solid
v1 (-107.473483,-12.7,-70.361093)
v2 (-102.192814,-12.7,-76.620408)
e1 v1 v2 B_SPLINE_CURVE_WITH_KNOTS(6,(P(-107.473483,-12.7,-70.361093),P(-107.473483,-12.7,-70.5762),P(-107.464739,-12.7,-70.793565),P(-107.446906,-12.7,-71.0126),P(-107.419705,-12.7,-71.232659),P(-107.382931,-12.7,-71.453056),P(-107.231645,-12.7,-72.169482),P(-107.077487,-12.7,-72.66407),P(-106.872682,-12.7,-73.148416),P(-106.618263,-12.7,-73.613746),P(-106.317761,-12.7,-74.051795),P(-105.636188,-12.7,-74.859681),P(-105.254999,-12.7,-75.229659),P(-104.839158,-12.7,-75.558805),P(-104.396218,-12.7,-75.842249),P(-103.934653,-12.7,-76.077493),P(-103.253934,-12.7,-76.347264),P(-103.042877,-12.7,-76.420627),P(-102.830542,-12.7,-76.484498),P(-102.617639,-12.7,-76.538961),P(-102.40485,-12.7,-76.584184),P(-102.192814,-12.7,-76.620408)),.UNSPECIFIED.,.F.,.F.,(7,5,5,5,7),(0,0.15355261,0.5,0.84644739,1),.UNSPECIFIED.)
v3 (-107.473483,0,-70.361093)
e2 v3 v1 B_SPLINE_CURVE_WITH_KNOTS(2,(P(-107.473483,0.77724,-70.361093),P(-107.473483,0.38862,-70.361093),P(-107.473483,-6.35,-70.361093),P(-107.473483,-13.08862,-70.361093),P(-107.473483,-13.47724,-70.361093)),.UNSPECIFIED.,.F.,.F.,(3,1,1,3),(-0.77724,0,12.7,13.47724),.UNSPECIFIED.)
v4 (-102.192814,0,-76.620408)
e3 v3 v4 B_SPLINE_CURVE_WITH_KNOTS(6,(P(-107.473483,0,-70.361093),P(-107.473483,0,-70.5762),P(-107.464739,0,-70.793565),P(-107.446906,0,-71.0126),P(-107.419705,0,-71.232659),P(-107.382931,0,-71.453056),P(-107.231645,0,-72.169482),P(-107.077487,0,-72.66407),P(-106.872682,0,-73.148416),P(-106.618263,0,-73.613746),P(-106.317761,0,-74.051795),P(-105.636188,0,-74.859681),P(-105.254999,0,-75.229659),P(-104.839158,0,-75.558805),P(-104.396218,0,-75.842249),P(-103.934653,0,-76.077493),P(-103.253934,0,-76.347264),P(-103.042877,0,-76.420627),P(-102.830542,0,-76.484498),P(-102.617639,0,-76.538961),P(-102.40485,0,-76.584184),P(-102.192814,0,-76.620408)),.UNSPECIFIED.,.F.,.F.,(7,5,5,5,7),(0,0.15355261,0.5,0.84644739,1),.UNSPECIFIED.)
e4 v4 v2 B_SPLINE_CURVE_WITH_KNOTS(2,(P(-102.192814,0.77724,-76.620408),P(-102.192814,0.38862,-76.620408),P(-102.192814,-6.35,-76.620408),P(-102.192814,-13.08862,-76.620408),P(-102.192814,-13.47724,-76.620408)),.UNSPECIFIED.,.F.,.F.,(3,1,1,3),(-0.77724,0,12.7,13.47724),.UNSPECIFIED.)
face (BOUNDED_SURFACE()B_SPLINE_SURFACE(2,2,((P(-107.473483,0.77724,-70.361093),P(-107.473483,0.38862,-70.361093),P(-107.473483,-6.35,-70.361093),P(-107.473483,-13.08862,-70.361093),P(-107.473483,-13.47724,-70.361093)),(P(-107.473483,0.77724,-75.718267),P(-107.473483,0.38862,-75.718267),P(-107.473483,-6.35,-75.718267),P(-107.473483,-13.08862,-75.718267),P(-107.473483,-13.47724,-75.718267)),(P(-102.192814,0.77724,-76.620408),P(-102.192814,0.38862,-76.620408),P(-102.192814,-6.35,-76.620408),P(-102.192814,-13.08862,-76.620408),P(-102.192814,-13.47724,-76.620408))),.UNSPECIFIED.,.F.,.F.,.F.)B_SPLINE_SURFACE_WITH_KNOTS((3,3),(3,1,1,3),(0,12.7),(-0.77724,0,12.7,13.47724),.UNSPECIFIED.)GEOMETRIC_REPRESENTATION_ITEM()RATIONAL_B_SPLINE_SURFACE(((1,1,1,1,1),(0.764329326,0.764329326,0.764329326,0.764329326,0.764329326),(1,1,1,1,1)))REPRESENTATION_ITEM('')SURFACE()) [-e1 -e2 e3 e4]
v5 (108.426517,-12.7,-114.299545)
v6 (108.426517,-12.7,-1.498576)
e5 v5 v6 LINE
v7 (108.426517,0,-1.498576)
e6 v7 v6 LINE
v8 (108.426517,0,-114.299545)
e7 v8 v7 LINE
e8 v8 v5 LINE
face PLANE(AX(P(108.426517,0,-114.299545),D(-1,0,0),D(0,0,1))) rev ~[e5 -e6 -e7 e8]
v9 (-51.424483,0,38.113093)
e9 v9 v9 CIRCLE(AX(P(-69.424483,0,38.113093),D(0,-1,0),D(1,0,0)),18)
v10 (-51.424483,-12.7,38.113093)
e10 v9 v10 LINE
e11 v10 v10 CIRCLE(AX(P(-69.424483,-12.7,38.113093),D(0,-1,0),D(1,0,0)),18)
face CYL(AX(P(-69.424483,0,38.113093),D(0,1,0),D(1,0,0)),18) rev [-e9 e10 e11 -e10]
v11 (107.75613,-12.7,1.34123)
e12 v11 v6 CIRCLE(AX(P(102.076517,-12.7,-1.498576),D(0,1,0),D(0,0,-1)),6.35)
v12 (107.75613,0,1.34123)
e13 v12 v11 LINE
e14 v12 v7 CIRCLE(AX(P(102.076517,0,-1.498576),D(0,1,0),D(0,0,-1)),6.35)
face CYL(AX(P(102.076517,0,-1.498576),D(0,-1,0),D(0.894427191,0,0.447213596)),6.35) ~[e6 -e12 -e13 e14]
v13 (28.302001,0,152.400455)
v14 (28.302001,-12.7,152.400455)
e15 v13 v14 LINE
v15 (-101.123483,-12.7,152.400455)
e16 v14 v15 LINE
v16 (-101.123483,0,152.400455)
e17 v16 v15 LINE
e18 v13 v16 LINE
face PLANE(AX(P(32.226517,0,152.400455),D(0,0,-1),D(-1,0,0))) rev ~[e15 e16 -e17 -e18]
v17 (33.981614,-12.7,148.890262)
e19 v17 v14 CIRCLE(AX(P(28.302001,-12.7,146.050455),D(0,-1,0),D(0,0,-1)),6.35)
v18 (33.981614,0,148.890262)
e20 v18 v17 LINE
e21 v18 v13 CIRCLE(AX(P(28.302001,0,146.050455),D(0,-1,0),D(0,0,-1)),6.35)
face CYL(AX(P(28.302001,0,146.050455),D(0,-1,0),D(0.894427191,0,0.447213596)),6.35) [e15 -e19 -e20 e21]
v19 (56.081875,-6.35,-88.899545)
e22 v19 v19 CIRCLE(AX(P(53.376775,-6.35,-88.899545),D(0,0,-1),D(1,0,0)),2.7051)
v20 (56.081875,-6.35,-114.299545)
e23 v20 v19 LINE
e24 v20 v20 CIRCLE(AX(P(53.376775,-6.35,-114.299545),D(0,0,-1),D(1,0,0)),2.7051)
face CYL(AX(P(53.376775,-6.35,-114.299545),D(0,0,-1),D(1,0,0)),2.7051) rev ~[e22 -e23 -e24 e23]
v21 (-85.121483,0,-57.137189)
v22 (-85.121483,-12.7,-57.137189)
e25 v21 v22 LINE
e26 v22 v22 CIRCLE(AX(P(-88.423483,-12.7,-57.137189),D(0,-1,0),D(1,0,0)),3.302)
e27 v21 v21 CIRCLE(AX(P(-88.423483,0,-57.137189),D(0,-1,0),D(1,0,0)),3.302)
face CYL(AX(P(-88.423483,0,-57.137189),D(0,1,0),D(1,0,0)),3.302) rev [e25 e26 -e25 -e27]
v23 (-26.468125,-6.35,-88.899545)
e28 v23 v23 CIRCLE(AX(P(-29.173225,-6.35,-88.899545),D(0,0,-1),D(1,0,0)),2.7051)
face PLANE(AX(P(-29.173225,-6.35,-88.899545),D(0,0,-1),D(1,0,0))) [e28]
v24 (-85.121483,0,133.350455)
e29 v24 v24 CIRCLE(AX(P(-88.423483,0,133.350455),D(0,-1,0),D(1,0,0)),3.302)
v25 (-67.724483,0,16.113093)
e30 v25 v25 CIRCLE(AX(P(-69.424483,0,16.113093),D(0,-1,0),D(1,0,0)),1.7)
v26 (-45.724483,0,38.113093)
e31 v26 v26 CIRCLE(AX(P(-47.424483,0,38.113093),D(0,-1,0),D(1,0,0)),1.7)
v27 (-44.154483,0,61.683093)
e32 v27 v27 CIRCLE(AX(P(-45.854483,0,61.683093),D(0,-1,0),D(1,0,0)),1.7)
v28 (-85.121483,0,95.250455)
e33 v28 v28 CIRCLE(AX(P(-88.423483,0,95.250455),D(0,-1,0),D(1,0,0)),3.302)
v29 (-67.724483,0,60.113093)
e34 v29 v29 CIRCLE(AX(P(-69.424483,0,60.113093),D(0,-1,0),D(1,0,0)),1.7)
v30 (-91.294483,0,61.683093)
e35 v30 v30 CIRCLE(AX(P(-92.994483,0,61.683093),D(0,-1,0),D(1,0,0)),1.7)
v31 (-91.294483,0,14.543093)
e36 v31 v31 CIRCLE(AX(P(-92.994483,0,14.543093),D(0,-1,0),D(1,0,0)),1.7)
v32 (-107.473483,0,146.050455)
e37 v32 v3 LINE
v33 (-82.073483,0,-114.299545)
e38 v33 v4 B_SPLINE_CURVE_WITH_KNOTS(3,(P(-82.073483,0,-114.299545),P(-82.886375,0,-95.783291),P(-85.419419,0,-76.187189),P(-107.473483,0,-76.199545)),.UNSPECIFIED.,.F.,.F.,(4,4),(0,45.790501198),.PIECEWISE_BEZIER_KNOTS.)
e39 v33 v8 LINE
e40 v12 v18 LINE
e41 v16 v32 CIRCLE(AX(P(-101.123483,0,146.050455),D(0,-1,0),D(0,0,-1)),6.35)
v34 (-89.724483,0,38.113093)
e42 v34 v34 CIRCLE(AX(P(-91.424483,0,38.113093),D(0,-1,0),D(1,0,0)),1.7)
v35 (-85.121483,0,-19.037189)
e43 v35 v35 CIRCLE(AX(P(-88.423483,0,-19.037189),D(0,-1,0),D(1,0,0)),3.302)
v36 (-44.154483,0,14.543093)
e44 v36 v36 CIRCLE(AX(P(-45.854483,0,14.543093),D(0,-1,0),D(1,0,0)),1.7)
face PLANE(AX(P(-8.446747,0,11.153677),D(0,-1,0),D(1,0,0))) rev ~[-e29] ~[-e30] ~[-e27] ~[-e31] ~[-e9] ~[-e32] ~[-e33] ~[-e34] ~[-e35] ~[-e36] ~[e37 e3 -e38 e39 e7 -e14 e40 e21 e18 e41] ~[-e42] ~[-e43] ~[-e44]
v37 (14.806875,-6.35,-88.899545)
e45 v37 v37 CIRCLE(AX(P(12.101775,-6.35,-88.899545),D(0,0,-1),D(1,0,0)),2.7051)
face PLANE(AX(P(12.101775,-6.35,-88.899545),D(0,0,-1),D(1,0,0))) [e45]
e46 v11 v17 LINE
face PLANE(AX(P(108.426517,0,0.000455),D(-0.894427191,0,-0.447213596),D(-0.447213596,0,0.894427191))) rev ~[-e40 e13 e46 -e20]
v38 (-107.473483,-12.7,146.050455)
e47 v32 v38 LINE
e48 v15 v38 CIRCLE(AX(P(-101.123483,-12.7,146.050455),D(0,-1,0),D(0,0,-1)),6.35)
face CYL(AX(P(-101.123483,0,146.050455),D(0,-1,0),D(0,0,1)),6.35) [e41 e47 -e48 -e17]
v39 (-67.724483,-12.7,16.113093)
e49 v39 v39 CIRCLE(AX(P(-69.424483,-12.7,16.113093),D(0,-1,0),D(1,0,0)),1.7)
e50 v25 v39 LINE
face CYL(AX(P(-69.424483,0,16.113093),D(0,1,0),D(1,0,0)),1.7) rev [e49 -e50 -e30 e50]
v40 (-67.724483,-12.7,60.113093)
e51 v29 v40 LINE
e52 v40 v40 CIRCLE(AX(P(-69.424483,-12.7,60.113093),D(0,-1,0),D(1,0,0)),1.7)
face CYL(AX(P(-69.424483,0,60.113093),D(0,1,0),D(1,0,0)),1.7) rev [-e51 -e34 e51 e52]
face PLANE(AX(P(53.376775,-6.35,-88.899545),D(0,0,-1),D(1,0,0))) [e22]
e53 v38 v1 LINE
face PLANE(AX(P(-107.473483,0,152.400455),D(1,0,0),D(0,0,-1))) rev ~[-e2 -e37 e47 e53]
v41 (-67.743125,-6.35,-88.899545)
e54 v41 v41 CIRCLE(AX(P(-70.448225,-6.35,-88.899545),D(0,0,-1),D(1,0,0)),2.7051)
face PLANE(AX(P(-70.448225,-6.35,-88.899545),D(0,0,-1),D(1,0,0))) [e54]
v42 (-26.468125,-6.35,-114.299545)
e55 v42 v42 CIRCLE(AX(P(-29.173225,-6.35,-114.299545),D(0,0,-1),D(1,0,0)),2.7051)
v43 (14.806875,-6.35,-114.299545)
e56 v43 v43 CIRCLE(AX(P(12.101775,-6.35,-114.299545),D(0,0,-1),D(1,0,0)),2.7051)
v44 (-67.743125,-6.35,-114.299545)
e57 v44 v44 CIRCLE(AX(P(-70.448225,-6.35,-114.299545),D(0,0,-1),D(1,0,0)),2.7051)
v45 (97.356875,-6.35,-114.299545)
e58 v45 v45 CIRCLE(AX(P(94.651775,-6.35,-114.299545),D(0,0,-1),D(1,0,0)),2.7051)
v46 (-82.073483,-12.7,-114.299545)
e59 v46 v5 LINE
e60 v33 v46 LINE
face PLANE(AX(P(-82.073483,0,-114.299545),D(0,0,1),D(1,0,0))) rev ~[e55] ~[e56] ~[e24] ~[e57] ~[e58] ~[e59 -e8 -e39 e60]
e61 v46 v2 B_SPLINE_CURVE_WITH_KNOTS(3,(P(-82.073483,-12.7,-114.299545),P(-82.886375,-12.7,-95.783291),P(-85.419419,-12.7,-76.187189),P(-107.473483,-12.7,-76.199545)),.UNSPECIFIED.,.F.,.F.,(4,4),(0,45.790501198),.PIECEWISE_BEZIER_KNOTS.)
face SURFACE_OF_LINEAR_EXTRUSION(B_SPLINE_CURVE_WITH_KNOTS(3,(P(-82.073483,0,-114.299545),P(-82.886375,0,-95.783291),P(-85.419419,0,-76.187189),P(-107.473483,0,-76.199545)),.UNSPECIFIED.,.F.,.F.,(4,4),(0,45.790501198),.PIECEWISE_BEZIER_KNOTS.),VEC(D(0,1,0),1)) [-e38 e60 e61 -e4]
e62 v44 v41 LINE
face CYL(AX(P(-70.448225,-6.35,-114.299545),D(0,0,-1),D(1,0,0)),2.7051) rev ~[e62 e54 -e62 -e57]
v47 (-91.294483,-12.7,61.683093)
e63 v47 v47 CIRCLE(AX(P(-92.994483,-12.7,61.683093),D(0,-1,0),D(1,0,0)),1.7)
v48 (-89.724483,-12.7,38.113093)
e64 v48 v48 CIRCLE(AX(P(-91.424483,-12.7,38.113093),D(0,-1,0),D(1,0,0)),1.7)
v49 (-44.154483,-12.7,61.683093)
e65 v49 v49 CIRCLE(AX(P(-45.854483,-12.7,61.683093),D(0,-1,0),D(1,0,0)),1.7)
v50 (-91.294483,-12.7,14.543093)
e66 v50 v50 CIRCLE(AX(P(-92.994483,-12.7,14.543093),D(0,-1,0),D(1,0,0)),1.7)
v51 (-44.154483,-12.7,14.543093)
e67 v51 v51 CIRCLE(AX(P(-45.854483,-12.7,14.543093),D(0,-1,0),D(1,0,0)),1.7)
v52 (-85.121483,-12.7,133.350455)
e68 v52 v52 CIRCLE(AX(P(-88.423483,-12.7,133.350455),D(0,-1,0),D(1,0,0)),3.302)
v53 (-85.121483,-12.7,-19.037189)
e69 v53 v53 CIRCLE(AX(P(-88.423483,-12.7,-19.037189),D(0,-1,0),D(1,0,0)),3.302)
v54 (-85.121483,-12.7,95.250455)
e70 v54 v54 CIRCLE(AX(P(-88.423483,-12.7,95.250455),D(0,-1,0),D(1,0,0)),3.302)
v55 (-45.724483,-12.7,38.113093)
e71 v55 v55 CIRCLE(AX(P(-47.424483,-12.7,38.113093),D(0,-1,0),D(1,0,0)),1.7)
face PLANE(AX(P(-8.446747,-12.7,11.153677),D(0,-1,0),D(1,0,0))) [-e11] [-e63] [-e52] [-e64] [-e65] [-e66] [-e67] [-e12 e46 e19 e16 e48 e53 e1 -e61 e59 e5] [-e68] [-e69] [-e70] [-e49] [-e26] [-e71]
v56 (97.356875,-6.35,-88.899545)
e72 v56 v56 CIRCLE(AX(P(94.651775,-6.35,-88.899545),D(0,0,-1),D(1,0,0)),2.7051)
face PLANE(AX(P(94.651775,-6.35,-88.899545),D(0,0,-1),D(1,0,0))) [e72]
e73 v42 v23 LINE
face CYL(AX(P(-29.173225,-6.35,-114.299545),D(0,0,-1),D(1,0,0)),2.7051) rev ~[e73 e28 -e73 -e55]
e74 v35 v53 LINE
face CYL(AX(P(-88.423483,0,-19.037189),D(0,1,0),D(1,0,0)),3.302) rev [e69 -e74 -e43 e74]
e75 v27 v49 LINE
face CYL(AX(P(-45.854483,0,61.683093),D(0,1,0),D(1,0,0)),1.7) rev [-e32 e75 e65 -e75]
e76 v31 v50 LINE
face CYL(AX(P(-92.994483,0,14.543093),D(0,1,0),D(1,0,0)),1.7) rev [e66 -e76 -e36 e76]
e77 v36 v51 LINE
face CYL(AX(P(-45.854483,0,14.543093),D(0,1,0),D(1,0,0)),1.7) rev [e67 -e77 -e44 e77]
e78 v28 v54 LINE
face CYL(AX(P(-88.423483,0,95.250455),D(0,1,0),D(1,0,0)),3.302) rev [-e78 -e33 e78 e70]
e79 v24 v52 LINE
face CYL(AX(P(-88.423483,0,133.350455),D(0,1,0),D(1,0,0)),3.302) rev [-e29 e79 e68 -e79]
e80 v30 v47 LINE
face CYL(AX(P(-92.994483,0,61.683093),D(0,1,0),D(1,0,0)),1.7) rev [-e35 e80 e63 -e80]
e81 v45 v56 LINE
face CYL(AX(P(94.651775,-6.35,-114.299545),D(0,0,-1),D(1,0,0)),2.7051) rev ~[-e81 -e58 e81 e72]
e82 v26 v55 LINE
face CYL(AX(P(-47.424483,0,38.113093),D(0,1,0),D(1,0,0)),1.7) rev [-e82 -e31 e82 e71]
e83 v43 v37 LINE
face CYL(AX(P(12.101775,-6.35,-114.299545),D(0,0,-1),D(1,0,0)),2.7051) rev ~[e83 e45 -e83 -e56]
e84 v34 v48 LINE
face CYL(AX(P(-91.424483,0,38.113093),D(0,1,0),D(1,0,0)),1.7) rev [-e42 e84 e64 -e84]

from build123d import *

# Parameters (mm, degrees)
F0_R     = 3.302
F0_R_2   = 1.7
F0_R_3   = 18
F1_DEPTH = 12.7
F2_DEPTH = 25.4
F3_R     = 6.35
F4_R     = 2.7051
F5_DEPTH = 25.4


# Not quite as in the source:
# - a feature names something its author has since deleted; it is built from what else it names


with BuildPart() as f1:
    # F0 (on Front) → F1 (new body)
    with BuildSketch(Plane.XZ):
        with BuildLine():
            Line((108.4265169831, 0.0004552842), (32.2265169831, 152.4004552842))
            Line((32.2265169831, 152.4004552842), (-107.4734830169, 152.4004552842))
            Line((-107.4734830169, 152.4004552842), (-107.4734830169, -76.1995447158))
            add(Edge.make_bspline(
                [(-82.0734830169, -114.2995447158), (-82.8863746009, -95.7832909802), (-85.4194185281, -76.1871889735), (-107.4734830169, -76.1995447158)],
                knots=[0, 0, 0, 0, 45.7905011984, 45.7905011984, 45.7905011984, 45.7905011984], degree=3))
            Line((-82.0734830169, -114.2995447158), (108.4265169831, -114.2995447158))
            Line((108.4265169831, -114.2995447158), (108.4265169831, 0.0004552842))
        make_face()
        with Locations((-88.4234830169, -57.1371889735)):
            Circle(F0_R, mode=Mode.SUBTRACT)
        with Locations((-88.4234830169, -19.0371889735)):
            Circle(F0_R, mode=Mode.SUBTRACT)
        with Locations((-92.9944827628, 14.5430932346)):
            Circle(F0_R_2, mode=Mode.SUBTRACT)
        with Locations((-69.4244827628, 16.1130932346)):
            Circle(F0_R_2, mode=Mode.SUBTRACT)
        with Locations((-45.8544827628, 14.5430932346)):
            Circle(F0_R_2, mode=Mode.SUBTRACT)
        with Locations((-91.4244827628, 38.1130932346)):
            Circle(F0_R_2, mode=Mode.SUBTRACT)
        with Locations((-69.4244827628, 38.1130932346)):
            Circle(F0_R_3, mode=Mode.SUBTRACT)
        with Locations((-92.9944827628, 61.6830932346)):
            Circle(F0_R_2, mode=Mode.SUBTRACT)
        with Locations((-69.4244827628, 60.1130932346)):
            Circle(F0_R_2, mode=Mode.SUBTRACT)
        with Locations((-47.4244827628, 38.1130932346)):
            Circle(F0_R_2, mode=Mode.SUBTRACT)
        with Locations((-45.8544827628, 61.6830932346)):
            Circle(F0_R_2, mode=Mode.SUBTRACT)
        with Locations((-88.4234830169, 95.2504552842)):
            Circle(F0_R, mode=Mode.SUBTRACT)
        with Locations((-88.4234830169, 133.3504552842)):
            Circle(F0_R, mode=Mode.SUBTRACT)
    extrude(amount=F1_DEPTH)

    # F0 (on Front) → F2 (cut)
    with BuildSketch(Plane.XZ):
        with BuildLine():
            add(Edge.make_bspline(
                [(-82.0734830169, -114.2995447158), (-82.8863746009, -95.7832909802), (-85.4194185281, -76.1871889735), (-107.4734830169, -76.1995447158)],
                knots=[0, 0, 0, 0, 45.7905011984, 45.7905011984, 45.7905011984, 45.7905011984], degree=3))
            Line((-107.4734830169, -76.1995447158), (-107.4734830169, -114.2995447158))
            Line((-107.4734830169, -114.2995447158), (-82.0734830169, -114.2995447158))
        make_face()
        with BuildLine():
            Line((108.4265169831, 0.0004552842), (32.2265169831, 152.4004552842))
            Line((32.2265169831, 152.4004552842), (-107.4734830169, 152.4004552842))
            Line((-107.4734830169, 152.4004552842), (-107.4734830169, -76.1995447158))
            add(Edge.make_bspline(
                [(-82.0734830169, -114.2995447158), (-82.8863746009, -95.7832909802), (-85.4194185281, -76.1871889735), (-107.4734830169, -76.1995447158)],
                knots=[0, 0, 0, 0, 45.7905011984, 45.7905011984, 45.7905011984, 45.7905011984], degree=3))
            Line((-82.0734830169, -114.2995447158), (108.4265169831, -114.2995447158))
            Line((108.4265169831, -114.2995447158), (108.4265169831, 0.0004552842))
        make_face()
        with Locations((-88.4234830169, -57.1371889735)):
            Circle(F0_R, mode=Mode.SUBTRACT)
        with Locations((-88.4234830169, -19.0371889735)):
            Circle(F0_R, mode=Mode.SUBTRACT)
        with Locations((-92.9944827628, 14.5430932346)):
            Circle(F0_R_2, mode=Mode.SUBTRACT)
        with Locations((-69.4244827628, 16.1130932346)):
            Circle(F0_R_2, mode=Mode.SUBTRACT)
        with Locations((-45.8544827628, 14.5430932346)):
            Circle(F0_R_2, mode=Mode.SUBTRACT)
        with Locations((-91.4244827628, 38.1130932346)):
            Circle(F0_R_2, mode=Mode.SUBTRACT)
        with Locations((-69.4244827628, 38.1130932346)):
            Circle(F0_R_3, mode=Mode.SUBTRACT)
        with Locations((-92.9944827628, 61.6830932346)):
            Circle(F0_R_2, mode=Mode.SUBTRACT)
        with Locations((-69.4244827628, 60.1130932346)):
            Circle(F0_R_2, mode=Mode.SUBTRACT)
        with Locations((-47.4244827628, 38.1130932346)):
            Circle(F0_R_2, mode=Mode.SUBTRACT)
        with Locations((-45.8544827628, 61.6830932346)):
            Circle(F0_R_2, mode=Mode.SUBTRACT)
        with Locations((-88.4234830169, 95.2504552842)):
            Circle(F0_R, mode=Mode.SUBTRACT)
        with Locations((-88.4234830169, 133.3504552842)):
            Circle(F0_R, mode=Mode.SUBTRACT)
    extrude(amount=-F2_DEPTH, mode=Mode.SUBTRACT)

    # F3
    f3_edges = [f1.edges().sort_by_distance(p)[0] for p in [
        (-107.473483, -6.35, -76.199545),
        (-107.473483, -6.35, 152.400455),
        (108.426517, -6.35, 0.000455),
        (32.226517, -6.35, 152.400455),
    ]]
    fillet(f3_edges, radius=F3_R)

    # F4 (on face) → F5 (cut)
    with BuildSketch(Plane(origin=(0, 0, -114.2995447158), x_dir=(1, 0, 0), z_dir=(0, 0, -1))):
        with Locations((-70.4482253863, 6.35)):
            Circle(F4_R)
        with Locations((-29.1732253863, 6.35)):
            Circle(F4_R)
        with Locations((12.1017746137, 6.35)):
            Circle(F4_R)
        with Locations((53.3767746137, 6.35)):
            Circle(F4_R)
        with Locations((94.6517746137, 6.35)):
            Circle(F4_R)
    extrude(amount=-F5_DEPTH, mode=Mode.SUBTRACT)


solid = f1.part
